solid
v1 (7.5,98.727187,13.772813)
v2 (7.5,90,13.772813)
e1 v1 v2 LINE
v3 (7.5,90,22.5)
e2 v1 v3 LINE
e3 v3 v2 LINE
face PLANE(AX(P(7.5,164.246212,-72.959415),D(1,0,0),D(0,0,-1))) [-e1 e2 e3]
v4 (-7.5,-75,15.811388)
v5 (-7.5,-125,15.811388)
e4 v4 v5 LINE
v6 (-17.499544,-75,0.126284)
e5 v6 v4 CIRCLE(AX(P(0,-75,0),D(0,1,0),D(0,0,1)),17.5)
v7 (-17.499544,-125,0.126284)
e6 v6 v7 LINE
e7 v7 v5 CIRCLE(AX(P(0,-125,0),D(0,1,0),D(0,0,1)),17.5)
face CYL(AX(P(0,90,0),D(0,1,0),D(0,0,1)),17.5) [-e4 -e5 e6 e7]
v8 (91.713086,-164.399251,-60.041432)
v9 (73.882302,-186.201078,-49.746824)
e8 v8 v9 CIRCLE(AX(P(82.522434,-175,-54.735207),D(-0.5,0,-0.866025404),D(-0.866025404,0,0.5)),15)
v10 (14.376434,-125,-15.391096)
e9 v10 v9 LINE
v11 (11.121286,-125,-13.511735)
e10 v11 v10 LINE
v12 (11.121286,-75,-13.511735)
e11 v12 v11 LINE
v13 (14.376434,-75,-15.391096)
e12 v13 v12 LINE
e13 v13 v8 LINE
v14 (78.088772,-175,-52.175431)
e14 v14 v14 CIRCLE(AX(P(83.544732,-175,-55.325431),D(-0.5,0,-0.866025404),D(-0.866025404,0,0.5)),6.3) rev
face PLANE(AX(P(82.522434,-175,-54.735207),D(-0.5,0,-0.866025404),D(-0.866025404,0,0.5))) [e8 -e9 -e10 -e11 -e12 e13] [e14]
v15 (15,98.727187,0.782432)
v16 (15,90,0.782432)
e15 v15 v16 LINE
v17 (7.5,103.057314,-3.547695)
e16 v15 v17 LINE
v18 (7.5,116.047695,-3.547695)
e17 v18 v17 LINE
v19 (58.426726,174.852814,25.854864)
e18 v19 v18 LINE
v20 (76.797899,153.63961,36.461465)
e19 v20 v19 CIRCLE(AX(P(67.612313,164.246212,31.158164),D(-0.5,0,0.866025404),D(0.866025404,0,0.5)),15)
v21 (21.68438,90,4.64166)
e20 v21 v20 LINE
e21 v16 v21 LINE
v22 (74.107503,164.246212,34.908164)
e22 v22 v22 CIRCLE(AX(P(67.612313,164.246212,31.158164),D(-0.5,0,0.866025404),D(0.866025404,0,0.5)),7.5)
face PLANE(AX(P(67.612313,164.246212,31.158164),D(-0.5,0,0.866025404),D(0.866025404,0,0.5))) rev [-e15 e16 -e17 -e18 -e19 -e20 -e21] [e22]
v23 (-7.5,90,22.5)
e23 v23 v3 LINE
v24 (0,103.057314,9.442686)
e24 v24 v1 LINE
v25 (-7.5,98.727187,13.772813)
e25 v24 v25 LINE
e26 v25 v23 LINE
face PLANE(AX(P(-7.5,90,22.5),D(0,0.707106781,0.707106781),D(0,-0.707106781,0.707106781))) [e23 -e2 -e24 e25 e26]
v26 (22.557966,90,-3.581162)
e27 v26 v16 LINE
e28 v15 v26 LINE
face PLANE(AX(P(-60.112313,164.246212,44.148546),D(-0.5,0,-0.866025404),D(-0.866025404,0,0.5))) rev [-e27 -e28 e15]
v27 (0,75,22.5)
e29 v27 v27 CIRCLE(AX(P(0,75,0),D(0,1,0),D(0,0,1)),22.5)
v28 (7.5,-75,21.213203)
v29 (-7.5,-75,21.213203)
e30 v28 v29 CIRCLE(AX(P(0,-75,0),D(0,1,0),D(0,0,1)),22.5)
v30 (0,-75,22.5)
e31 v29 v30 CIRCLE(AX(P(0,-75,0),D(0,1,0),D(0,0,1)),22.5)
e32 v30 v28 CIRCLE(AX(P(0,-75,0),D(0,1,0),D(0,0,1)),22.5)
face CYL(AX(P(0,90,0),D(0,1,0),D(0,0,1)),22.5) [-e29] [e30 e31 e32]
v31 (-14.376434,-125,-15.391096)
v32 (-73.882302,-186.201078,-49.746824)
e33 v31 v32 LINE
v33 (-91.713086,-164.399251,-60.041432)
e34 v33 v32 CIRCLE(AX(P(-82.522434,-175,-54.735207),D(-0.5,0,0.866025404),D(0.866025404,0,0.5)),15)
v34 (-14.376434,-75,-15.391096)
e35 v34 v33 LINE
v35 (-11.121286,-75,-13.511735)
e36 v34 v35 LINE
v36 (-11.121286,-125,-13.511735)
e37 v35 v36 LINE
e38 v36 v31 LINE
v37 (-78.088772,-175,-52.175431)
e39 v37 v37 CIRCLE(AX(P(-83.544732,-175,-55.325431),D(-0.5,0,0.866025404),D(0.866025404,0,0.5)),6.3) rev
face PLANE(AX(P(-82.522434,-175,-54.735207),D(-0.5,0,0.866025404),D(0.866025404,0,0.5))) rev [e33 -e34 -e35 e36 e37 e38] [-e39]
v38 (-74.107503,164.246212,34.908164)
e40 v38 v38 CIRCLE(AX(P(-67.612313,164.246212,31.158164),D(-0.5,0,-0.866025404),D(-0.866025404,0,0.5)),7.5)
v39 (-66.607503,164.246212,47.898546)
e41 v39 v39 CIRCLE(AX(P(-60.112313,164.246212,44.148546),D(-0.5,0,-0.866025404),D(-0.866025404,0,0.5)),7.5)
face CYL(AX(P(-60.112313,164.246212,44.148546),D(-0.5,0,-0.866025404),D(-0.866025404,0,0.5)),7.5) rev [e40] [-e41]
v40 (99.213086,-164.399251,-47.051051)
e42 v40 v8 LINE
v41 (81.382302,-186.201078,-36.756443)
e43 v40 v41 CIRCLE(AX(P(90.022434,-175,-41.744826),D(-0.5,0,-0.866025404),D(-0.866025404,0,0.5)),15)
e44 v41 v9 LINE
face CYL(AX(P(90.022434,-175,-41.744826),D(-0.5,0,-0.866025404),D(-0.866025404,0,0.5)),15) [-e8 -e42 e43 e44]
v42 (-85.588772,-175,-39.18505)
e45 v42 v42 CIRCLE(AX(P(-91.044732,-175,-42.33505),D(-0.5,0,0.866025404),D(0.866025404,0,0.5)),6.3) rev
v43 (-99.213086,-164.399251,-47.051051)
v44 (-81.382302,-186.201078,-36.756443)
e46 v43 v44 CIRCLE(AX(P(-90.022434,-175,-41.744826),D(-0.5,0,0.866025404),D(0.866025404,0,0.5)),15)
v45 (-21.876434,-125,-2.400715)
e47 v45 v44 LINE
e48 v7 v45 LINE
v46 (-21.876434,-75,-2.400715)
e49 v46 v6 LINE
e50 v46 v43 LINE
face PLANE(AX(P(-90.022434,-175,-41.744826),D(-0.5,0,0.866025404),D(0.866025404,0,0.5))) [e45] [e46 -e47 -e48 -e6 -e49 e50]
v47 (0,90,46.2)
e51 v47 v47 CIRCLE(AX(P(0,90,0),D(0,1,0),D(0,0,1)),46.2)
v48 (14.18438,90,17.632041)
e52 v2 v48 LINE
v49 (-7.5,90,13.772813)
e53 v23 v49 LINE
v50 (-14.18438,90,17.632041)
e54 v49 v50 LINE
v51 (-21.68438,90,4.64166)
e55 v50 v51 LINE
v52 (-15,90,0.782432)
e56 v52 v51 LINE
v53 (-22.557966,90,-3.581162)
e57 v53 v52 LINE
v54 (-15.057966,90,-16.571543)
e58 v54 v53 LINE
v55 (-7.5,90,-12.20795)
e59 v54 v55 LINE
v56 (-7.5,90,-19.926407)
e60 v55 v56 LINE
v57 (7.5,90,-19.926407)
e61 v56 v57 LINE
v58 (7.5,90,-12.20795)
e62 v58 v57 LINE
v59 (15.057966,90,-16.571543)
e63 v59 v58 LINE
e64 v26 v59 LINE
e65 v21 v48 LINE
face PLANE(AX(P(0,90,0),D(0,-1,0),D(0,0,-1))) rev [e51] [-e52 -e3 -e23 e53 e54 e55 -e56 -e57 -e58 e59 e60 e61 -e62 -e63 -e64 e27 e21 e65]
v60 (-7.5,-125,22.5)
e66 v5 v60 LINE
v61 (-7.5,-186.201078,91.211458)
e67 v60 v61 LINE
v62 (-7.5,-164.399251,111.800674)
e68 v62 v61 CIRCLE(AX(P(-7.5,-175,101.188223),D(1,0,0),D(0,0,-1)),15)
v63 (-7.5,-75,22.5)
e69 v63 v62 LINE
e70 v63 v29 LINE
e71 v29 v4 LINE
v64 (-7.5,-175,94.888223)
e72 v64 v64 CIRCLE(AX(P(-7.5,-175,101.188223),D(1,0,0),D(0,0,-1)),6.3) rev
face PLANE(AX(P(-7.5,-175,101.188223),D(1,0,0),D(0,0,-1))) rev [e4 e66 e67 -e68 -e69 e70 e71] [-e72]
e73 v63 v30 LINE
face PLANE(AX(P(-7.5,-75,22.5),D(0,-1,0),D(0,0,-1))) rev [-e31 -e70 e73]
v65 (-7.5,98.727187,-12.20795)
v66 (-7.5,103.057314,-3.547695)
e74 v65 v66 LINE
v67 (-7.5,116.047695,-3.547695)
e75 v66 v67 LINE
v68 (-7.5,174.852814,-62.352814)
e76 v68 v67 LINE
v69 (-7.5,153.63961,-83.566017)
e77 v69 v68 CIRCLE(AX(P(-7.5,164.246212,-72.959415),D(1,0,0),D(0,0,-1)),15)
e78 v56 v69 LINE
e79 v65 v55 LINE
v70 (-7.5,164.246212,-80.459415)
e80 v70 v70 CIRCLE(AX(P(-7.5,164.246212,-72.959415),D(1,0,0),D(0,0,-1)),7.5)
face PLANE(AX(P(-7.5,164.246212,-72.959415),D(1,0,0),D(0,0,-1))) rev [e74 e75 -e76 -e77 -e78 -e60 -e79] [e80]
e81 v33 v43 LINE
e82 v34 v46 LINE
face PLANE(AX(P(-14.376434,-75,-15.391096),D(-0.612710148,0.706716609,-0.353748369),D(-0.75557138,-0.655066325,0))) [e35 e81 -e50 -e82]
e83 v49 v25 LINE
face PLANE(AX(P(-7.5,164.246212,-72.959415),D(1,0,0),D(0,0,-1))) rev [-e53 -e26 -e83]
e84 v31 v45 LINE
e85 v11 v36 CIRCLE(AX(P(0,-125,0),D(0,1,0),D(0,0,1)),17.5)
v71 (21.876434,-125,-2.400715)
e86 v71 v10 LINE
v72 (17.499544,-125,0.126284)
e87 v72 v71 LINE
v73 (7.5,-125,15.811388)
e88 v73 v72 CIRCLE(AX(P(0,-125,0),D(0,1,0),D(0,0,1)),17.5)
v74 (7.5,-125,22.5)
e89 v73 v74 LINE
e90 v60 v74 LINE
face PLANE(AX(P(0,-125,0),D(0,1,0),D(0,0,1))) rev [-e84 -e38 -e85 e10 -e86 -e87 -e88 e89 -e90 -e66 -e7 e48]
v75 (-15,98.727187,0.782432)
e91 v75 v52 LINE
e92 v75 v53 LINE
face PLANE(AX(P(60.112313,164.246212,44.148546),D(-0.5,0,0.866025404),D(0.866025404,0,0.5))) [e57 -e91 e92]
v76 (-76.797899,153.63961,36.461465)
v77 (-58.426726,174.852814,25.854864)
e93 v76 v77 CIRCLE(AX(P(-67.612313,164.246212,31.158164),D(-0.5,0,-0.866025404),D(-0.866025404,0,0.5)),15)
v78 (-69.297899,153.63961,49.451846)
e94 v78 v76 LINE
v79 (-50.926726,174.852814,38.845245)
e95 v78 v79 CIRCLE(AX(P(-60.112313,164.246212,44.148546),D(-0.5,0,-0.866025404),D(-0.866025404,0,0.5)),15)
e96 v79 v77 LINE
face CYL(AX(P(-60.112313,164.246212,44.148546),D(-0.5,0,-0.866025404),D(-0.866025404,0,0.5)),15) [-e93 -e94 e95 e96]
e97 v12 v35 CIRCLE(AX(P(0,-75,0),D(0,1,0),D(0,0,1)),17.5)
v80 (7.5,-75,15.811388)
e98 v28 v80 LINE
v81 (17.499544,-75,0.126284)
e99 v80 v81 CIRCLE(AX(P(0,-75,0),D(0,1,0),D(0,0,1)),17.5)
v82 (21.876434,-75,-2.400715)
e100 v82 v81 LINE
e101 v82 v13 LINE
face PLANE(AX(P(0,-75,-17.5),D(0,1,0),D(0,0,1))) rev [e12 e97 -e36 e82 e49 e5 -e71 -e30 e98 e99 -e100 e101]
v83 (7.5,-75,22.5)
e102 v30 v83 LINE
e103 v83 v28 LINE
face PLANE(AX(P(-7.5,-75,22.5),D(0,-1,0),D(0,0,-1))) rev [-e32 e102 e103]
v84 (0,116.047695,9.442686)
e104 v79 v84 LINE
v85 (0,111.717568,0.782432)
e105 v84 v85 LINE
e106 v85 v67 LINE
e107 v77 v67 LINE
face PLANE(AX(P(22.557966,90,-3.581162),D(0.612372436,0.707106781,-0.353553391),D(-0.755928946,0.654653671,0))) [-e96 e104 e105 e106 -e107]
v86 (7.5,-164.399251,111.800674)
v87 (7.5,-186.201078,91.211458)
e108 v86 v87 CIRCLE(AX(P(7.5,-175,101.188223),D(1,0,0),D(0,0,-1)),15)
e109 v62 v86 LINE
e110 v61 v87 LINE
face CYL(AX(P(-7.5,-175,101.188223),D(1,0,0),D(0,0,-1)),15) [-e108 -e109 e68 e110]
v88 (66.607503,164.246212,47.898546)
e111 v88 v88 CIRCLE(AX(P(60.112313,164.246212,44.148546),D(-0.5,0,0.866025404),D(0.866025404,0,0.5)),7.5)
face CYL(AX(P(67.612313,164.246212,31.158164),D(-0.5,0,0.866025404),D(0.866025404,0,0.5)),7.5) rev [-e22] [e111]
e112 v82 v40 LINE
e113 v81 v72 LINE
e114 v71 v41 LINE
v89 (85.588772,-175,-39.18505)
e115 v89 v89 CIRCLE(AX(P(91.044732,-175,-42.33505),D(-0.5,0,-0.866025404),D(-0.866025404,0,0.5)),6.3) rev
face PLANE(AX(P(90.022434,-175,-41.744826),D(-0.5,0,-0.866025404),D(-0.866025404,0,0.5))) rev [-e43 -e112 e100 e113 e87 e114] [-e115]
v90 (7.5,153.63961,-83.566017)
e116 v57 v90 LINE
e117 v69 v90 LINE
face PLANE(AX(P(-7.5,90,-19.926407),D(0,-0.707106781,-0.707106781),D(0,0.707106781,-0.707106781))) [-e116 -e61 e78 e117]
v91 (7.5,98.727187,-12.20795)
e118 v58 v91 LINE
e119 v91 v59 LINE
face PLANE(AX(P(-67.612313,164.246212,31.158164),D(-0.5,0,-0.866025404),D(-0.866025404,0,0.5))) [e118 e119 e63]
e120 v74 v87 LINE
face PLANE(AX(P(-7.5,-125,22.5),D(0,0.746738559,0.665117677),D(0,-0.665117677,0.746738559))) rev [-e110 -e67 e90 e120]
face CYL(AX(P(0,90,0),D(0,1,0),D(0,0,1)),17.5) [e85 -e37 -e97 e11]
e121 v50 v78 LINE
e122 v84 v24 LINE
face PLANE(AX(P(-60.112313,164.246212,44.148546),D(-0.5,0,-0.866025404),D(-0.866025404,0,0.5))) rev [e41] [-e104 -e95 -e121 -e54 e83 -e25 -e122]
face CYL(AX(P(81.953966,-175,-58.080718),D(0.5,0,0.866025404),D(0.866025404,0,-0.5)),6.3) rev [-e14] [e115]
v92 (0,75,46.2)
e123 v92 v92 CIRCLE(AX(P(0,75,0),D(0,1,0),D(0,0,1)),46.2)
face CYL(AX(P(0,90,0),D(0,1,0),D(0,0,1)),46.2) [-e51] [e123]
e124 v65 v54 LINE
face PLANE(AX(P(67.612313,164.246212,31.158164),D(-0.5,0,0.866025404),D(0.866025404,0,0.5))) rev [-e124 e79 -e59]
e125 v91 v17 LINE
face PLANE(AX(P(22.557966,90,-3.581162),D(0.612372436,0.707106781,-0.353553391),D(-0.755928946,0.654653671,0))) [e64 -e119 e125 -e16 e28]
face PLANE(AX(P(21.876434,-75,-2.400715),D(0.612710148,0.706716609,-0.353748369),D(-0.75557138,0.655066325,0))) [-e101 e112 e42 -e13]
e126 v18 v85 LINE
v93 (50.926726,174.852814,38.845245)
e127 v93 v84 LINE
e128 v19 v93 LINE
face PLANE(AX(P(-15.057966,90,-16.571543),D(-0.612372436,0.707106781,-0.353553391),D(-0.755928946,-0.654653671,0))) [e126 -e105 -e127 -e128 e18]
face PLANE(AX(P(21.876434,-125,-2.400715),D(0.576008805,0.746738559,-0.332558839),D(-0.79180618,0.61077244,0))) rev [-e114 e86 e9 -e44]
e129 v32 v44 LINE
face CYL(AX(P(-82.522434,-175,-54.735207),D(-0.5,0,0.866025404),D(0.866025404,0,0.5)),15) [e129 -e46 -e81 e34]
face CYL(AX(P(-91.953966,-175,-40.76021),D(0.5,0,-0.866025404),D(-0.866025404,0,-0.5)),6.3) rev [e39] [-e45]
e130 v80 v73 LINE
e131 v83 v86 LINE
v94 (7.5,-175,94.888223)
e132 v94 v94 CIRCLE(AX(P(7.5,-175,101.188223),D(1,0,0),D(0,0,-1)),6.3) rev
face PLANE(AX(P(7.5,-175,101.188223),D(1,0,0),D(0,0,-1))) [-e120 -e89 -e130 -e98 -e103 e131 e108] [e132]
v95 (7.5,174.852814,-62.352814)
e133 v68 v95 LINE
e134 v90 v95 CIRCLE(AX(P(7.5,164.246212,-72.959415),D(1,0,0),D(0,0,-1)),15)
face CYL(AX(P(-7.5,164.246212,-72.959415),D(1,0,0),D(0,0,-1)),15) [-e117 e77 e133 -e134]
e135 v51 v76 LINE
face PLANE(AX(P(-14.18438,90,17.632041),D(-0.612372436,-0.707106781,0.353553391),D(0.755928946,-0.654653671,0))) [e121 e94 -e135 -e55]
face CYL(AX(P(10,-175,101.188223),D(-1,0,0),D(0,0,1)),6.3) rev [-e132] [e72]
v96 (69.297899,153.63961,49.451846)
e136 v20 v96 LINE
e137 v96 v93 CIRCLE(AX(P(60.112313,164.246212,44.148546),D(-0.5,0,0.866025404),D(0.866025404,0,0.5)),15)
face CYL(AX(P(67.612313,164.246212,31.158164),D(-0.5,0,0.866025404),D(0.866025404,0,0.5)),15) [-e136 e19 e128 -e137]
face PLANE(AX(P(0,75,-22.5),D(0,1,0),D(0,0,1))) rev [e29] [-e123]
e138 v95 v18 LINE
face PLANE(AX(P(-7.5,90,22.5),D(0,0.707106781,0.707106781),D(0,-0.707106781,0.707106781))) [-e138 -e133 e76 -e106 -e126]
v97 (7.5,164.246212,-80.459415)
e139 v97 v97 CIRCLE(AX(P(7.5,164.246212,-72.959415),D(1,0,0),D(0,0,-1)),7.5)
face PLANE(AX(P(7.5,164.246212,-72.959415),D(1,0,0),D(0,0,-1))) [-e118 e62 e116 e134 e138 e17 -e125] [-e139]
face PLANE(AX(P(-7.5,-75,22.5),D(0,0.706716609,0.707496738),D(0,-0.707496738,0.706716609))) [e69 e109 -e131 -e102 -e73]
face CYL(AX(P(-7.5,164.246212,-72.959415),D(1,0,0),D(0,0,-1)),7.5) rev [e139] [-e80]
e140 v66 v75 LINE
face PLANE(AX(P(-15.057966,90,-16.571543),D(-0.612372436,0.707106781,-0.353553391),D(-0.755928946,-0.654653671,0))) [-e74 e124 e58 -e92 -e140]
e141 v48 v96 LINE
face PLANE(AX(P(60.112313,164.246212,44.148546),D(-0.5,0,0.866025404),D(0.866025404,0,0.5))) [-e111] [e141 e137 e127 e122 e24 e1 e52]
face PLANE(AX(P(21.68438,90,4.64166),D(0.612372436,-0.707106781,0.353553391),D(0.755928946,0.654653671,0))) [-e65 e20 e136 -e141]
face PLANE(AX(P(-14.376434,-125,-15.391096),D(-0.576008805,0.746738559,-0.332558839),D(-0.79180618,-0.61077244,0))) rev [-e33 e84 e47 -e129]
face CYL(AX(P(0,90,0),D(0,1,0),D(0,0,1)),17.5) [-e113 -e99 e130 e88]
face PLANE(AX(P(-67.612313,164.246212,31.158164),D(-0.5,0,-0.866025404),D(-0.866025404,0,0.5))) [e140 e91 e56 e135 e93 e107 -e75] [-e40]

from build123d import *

# Parameters (mm, degrees)
CROQUIS3_R               = 7.5
SALIENTE_EXTRUIR10_DEPTH = 7.5
SALIENTE_EXTRUIR24_DEPTH = 7.5
CROQUIS5_R               = 6.3
CORTAR_EXTRUIR1_DEPTH    = 10
MATRIZC1_COUNT           = 3
MATRIZC2_START           = -8.85913735
MATRIZC2_OUTLINE_R       = 6.3
MATRIZC2_DEPTH           = 15
MATRIZC2_START_2         = -6.14086265
MATRIZC2_2_OUTLINE_R     = 6.3
MATRIZC2_2_DEPTH         = 15
MATRIZC3_COUNT           = 3


# Read off the part's stored shape, not the designer's step: MatrizC2
with BuildPart() as part:
    # Croquis1 → Revolución1 (revolve)
    with BuildSketch(Plane(origin=(0, 0, 0), x_dir=(0, 0, -1), z_dir=(1, 0, 0)), mode=Mode.PRIVATE) as revoluci_n1_sk:
        Polygon((0, 90), (0, -125), (17.5, -125), (17.5, -75), (22.5, -75), (22.5, 75), (46.2, 75), (46.2, 90), align=None)
    revolve(revoluci_n1_sk.sketch.rotate(Axis((0, 90, 0), (0, -1, 0)), 180), axis=Axis((0, 90, 0), (0, -1, 0)))

    # Croquis3 → Saliente-Extruir10 (add, symmetric)
    with BuildSketch(Plane(origin=(0, 0, 0), x_dir=(0, 0, -1), z_dir=(1, 0, 0))):
        with BuildLine():
            Line((-22.5, 90), (19.926406871, 90))
            Line((19.926406871, 90), (83.566017178, 153.639610307))
            ThreePointArc((83.566017178, 153.639610307), (83.566017178, 174.852813742), (62.352813742, 174.852813742))
            Line((62.352813742, 174.852813742), (-22.5, 90))
        make_face()
        with Locations((72.95941546, 164.246212025)):
            Circle(CROQUIS3_R, mode=Mode.SUBTRACT)
    saliente_extruir10 = extrude(amount=SALIENTE_EXTRUIR10_DEPTH, both=True)

    # Croquis4 → Saliente-Extruir24 (add, symmetric)
    with BuildSketch(Plane(origin=(0, 0, 0), x_dir=(0, 0, -1), z_dir=(1, 0, 0))):
        with BuildLine():
            Line((-22.5, -75), (-111.800673807, -164.399250863))
            ThreePointArc((-111.800673807, -164.399250863), (-112.093769258, -185.298983205), (-91.211457576, -186.201078383))
            Line((-91.211457576, -186.201078383), (-22.5, -125))
            Line((-22.5, -125), (-3.021288489, -125))
            Line((-3.021288489, -125), (-3.021288489, -75))
            Line((-3.021288489, -75), (-22.5, -75))
        make_face()
    saliente_extruir24 = extrude(amount=SALIENTE_EXTRUIR24_DEPTH, both=True)

    # Croquis5 → Cortar-Extruir1 (cut, symmetric)
    with BuildSketch(Plane(origin=(0, 0, 0), x_dir=(0, 0, -1), z_dir=(1, 0, 0))):
        with Locations((-101.188222736, -175)):
            Circle(CROQUIS5_R)
    extrude(amount=CORTAR_EXTRUIR1_DEPTH, both=True, mode=Mode.SUBTRACT)

    # MatrizC1: Saliente-Extruir24 ×3 about axis
    matrizc1_axis = Axis((0, 0, 1.56939663), (0, 1, 0))
    for i in range(1, MATRIZC1_COUNT):
        add(saliente_extruir24.rotate(matrizc1_axis, i * 360 / MATRIZC1_COUNT))

    # MatrizC2 outline → MatrizC2 (cut)
    with BuildSketch(Plane(origin=(0, 0, 0), x_dir=(0.8660254037844362, 0, 0.5000000000000042), z_dir=(0.5000000000000042, 0, -0.8660254037844363)).offset(MATRIZC2_START)):
        with Locations((-100.01457544, 175)):
            Circle(MATRIZC2_OUTLINE_R)
    extrude(amount=MATRIZC2_DEPTH, mode=Mode.SUBTRACT)

    # MatrizC2 2 outline → MatrizC2 2 (cut)
    with BuildSketch(Plane(origin=(0, 0, 0), x_dir=(0.8660254037844431, 0, -0.4999999999999921), z_dir=(0.4999999999999921, 0, 0.8660254037844433)).offset(MATRIZC2_START_2)):
        with Locations((100.01457544, -175)):
            Circle(MATRIZC2_2_OUTLINE_R)
    extrude(amount=MATRIZC2_2_DEPTH, mode=Mode.SUBTRACT)

    # MatrizC3: Saliente-Extruir10 ×3 about axis
    matrizc3_axis = Axis((0, 0, 0.782431531), (0, 1, 0))
    for i in range(1, MATRIZC3_COUNT):
        add(saliente_extruir10.rotate(matrizc3_axis, i * 360 / MATRIZC3_COUNT))


solid = part.part
